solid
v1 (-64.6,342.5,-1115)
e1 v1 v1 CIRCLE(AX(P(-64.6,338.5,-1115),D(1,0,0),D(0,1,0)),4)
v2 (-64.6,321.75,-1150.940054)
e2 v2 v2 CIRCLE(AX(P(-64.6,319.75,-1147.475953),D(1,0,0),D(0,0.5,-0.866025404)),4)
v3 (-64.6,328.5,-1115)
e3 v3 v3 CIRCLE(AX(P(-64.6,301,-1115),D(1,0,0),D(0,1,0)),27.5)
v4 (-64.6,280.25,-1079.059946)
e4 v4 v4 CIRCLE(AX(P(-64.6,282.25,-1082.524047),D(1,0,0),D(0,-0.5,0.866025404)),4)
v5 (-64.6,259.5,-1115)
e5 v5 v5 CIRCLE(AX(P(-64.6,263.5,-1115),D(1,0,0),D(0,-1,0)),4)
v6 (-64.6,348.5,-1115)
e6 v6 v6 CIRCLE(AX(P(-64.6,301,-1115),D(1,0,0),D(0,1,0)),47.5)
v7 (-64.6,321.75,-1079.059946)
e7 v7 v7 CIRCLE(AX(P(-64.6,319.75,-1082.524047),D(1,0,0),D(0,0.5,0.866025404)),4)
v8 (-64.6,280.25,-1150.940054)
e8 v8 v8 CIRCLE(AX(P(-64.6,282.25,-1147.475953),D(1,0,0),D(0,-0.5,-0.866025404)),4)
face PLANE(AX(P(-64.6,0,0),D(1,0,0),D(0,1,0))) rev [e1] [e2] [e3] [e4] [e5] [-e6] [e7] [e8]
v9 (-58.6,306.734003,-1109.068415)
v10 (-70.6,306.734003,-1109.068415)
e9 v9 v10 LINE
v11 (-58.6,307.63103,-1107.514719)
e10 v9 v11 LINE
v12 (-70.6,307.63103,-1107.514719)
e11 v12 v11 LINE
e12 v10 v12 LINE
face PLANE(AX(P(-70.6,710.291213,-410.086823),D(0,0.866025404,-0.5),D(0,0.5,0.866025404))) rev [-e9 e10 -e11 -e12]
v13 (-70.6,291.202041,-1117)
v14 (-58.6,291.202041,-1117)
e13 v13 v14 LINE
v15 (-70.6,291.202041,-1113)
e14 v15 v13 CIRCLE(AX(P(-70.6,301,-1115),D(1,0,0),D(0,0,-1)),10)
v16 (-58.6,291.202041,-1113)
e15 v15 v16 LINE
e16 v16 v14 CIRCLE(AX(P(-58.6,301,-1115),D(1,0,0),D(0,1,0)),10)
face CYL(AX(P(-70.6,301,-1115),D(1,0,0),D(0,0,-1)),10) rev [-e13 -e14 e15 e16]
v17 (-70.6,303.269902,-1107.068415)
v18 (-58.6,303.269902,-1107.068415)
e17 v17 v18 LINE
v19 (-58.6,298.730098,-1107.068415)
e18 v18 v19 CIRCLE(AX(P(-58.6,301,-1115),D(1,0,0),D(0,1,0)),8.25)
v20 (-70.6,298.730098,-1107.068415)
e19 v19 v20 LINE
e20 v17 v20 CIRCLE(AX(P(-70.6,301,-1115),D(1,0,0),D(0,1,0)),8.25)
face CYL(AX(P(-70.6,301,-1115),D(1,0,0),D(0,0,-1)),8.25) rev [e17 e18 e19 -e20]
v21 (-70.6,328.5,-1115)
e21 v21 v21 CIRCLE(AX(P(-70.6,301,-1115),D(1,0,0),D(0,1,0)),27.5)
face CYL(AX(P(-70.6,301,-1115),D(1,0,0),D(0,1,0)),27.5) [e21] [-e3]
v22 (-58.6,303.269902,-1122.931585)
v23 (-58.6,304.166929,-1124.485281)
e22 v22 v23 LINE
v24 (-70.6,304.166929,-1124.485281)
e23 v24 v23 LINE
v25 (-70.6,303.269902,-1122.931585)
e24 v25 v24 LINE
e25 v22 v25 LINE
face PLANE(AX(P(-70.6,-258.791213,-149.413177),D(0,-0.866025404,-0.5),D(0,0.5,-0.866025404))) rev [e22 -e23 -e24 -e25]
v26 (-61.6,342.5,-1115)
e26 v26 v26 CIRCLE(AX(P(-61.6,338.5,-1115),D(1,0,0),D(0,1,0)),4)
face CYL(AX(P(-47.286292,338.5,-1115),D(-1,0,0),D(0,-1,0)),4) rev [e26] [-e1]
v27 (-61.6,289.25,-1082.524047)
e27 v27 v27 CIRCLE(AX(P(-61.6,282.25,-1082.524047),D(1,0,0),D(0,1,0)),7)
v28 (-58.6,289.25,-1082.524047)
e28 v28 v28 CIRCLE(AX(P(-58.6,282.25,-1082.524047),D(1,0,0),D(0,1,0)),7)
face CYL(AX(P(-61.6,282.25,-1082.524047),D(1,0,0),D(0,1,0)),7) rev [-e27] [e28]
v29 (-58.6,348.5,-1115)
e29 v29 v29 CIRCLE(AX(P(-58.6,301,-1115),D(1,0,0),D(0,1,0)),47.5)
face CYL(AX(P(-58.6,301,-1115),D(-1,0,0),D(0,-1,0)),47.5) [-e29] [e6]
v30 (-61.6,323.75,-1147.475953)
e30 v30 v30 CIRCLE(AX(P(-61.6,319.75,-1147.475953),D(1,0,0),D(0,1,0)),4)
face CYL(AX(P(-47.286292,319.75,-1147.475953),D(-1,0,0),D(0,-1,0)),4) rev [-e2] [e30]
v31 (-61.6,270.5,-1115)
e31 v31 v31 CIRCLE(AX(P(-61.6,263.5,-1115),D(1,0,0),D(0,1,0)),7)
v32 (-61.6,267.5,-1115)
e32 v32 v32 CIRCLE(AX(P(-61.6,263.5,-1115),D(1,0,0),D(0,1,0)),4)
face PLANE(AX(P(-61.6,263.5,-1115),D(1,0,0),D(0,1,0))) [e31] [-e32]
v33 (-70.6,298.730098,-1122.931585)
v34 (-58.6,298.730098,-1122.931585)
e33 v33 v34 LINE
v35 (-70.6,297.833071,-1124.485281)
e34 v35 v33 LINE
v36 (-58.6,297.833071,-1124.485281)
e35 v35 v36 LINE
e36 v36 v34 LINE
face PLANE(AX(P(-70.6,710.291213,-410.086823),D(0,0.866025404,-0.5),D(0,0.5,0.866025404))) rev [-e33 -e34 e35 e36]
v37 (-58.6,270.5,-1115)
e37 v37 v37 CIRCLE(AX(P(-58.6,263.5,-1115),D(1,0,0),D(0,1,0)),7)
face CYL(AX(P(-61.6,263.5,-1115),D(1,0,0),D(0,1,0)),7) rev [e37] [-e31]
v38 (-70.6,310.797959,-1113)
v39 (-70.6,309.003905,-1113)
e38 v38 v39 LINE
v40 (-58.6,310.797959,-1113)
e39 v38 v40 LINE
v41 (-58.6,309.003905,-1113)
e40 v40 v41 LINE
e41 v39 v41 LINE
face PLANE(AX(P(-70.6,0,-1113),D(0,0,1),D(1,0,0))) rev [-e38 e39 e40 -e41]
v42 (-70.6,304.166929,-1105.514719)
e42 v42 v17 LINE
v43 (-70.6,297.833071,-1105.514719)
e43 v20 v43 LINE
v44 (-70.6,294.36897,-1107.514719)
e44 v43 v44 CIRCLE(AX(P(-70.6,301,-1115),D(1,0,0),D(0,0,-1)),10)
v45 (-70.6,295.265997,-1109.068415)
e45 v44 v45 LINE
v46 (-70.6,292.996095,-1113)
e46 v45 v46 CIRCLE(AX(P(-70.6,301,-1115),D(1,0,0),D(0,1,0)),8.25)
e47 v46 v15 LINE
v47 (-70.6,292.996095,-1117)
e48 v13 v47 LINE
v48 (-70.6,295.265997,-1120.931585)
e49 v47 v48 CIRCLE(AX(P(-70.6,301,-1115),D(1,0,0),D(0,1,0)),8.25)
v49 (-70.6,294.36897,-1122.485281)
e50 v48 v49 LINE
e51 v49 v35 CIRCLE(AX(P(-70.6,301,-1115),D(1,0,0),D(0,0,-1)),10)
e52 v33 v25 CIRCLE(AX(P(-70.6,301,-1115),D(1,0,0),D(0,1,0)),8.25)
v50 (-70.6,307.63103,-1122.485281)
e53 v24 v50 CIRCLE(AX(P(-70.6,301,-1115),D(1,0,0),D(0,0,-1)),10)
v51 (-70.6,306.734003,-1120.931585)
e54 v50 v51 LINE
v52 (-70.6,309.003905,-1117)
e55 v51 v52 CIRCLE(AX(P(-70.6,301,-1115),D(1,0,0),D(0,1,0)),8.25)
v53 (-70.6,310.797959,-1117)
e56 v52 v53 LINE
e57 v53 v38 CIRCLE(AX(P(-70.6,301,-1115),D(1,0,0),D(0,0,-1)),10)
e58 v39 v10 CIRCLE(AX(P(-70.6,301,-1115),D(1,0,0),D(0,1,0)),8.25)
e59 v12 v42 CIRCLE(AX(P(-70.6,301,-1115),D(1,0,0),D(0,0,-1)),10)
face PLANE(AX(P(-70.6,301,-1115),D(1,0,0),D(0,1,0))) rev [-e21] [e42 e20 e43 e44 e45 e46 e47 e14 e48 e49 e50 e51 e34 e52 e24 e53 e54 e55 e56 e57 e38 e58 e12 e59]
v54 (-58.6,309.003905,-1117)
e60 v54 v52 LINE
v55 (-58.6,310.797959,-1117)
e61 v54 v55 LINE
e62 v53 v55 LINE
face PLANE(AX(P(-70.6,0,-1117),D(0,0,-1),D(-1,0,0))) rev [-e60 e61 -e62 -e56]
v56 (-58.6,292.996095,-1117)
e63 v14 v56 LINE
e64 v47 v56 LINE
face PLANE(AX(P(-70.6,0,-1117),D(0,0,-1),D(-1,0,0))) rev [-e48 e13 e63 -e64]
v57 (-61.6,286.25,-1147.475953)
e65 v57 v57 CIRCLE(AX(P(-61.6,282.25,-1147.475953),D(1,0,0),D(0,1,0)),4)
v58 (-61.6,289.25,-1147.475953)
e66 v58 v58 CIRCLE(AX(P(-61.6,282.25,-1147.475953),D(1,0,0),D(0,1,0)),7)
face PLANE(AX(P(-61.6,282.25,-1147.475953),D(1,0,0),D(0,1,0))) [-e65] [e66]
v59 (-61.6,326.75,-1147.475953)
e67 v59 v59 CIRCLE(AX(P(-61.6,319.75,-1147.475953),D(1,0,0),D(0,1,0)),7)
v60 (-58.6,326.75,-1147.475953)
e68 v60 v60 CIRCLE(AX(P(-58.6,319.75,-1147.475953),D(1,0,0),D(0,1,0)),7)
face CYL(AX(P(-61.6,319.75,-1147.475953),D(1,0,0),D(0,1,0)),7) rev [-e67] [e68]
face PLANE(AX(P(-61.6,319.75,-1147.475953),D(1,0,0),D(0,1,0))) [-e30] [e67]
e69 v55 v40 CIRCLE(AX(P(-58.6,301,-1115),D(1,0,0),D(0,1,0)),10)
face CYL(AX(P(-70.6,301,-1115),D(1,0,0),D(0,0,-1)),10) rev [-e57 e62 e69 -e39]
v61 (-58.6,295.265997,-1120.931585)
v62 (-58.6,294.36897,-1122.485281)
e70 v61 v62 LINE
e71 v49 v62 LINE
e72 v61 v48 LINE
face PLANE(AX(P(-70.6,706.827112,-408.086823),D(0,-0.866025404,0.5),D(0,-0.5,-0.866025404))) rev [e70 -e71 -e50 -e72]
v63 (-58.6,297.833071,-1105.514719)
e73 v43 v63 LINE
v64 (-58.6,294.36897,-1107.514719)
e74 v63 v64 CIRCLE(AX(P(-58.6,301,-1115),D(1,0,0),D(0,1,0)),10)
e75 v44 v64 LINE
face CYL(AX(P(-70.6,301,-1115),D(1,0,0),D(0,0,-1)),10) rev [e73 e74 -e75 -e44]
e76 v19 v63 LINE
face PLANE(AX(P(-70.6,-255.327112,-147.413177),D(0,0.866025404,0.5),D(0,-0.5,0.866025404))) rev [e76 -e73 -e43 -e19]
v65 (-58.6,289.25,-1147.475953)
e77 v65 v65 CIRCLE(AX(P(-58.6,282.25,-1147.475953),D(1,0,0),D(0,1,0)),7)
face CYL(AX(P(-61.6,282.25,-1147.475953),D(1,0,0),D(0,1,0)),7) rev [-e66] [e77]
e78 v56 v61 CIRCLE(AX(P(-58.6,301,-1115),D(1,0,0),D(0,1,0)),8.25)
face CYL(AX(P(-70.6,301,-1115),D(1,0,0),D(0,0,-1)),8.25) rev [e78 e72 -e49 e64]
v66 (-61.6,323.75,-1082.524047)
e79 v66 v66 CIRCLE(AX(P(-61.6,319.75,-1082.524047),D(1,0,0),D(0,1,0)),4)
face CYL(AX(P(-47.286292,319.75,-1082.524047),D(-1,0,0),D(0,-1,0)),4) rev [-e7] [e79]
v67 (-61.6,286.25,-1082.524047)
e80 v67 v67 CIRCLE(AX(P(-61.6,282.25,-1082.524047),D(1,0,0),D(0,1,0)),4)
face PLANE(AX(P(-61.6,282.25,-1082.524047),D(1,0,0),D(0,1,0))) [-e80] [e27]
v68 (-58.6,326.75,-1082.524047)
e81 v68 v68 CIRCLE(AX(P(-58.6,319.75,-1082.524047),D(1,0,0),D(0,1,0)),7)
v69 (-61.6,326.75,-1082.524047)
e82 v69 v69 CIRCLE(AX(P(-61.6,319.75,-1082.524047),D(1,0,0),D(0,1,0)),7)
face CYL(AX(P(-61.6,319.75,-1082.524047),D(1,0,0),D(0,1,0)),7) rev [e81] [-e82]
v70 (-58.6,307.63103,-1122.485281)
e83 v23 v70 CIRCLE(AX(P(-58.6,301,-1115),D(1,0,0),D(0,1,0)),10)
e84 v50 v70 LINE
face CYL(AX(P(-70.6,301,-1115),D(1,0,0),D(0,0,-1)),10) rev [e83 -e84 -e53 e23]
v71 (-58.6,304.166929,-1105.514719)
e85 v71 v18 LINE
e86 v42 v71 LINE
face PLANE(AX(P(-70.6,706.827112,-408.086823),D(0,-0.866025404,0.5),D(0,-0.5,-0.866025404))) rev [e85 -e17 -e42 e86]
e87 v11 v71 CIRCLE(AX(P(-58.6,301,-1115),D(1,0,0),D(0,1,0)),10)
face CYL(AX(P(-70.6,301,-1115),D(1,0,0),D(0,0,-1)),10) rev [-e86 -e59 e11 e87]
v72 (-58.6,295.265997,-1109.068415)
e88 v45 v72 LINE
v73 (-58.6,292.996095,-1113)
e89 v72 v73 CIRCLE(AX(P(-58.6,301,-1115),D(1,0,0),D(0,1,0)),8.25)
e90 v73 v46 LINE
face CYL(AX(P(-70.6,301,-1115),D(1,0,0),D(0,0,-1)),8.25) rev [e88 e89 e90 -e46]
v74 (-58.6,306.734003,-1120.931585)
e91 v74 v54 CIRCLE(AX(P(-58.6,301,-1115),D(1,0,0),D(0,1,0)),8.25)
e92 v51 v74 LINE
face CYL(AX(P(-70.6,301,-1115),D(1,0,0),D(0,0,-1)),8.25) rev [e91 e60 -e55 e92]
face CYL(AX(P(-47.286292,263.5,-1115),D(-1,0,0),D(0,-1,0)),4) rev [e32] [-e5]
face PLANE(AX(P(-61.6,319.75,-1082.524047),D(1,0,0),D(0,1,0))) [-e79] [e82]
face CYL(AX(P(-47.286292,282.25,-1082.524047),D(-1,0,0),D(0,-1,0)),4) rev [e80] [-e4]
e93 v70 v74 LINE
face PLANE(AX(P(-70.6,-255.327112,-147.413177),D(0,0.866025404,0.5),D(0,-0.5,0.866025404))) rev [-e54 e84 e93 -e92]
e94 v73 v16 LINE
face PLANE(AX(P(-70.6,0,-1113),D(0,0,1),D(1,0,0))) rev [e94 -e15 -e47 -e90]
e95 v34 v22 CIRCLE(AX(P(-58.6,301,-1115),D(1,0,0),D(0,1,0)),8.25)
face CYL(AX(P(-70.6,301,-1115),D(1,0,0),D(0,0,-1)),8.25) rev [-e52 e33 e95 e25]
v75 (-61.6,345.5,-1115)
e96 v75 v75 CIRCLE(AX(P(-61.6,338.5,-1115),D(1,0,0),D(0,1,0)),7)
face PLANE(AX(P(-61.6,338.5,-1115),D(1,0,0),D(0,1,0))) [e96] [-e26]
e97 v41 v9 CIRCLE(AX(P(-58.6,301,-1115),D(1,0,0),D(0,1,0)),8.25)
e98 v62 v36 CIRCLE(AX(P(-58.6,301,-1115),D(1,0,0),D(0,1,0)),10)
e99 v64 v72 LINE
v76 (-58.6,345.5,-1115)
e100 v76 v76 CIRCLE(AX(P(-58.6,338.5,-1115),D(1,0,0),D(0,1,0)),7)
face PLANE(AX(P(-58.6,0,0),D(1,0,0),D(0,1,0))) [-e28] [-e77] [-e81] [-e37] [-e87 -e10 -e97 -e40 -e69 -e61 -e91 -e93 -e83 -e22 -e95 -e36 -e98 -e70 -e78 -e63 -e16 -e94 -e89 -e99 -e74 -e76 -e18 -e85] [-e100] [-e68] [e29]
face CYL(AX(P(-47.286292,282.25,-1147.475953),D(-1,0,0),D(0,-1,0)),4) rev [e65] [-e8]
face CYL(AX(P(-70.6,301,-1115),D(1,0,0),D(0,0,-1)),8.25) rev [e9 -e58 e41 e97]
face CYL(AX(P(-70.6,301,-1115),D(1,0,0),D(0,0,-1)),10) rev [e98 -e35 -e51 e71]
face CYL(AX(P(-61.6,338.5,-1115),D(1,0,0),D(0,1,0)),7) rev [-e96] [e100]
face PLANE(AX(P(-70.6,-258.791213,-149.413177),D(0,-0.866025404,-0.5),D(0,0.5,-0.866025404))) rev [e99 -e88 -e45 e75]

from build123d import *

# Parameters (mm, degrees)
BOSS_EXTRUDE1_OUTLINE_R = 47.5
BOSS_EXTRUDE1_DEPTH     = 6
SKETCH3_R               = 27.5
BOSS_EXTRUDE2_DEPTH     = 6
SKETCH1_3_R             = 4
CUT_EXTRUDE1_DEPTH      = 6
CUT_EXTRUDE2_START      = 3
SKETCH1_4_R             = 7
SKETCH1_4_R_2           = 4
CUT_EXTRUDE2_DEPTH      = 3
CIRPATTERN1_COUNT       = 6
CUT_EXTRUDE3_START      = -58.6
SKETCH4_R               = 8.25
CUT_EXTRUDE3_DEPTH      = 1158.065603692
CUT_EXTRUDE5_DEPTH      = 1216.665603692


# Read off the part's stored shape, not the designer's step: Boss-Extrude1
with BuildPart() as part:
    # Boss-Extrude1 outline → Boss-Extrude1 (new body)
    with BuildSketch(Plane(origin=(-64.6, 0, 0), x_dir=(0, 0, -1), z_dir=(1, 0, 0))):
        with Locations((1115, 301)):
            Circle(BOSS_EXTRUDE1_OUTLINE_R)
    extrude(amount=BOSS_EXTRUDE1_DEPTH)

    # Sketch3 → Boss-Extrude2 (add)
    with BuildSketch(Plane(origin=(-64.6, 0, 0), x_dir=(0, 0, -1), z_dir=(1, 0, 0))):
        with Locations(Location((1115, 301, 0), (0, 0, 90))):
            Circle(SKETCH3_R)
    extrude(amount=-BOSS_EXTRUDE2_DEPTH)

    # Sketch1<3> → Cut-Extrude1 (cut)
    with BuildSketch(Plane(origin=(-64.6, 0, 0), x_dir=(0, 0, -1), z_dir=(1, 0, 0))):
        with Locations(Location((1115, 338.5, 0), (0, 0, 90))):
            Circle(SKETCH1_3_R)
    cut_extrude1 = extrude(amount=CUT_EXTRUDE1_DEPTH, mode=Mode.SUBTRACT)

    # Sketch1<4> → Cut-Extrude2 (cut)
    with BuildSketch(Plane(origin=(-64.6, 0, 0), x_dir=(0, 0, -1), z_dir=(1, 0, 0)).offset(CUT_EXTRUDE2_START)):
        with Locations(Location((1115, 338.5, 0), (0, 0, 90))):
            Circle(SKETCH1_4_R)
        with Locations(Location((1115, 338.5, 0), (0, 0, 90))):
            Circle(SKETCH1_4_R_2, mode=Mode.SUBTRACT)
    cut_extrude2 = extrude(amount=CUT_EXTRUDE2_DEPTH, mode=Mode.SUBTRACT)

    # CirPattern1: Cut-Extrude1, Cut-Extrude2 ×6 about axis
    cirpattern1_axis = Axis((0, 301, -1115), (1, 0, 0))
    add([cut_extrude1.rotate(cirpattern1_axis, i * 360 / CIRPATTERN1_COUNT) for i in range(1, CIRPATTERN1_COUNT)], mode=Mode.SUBTRACT)
    add([cut_extrude2.rotate(cirpattern1_axis, i * 360 / CIRPATTERN1_COUNT) for i in range(1, CIRPATTERN1_COUNT)], mode=Mode.SUBTRACT)

    # Sketch4 → Cut-Extrude3 (cut, through all)
    with BuildSketch(Plane(origin=(0, 0, 0), x_dir=(0, 0, -1), z_dir=(1, 0, 0)).offset(CUT_EXTRUDE3_START)):
        with Locations(Location((1115, 301, 0), (0, 0, 90))):
            Circle(SKETCH4_R)
    extrude(amount=-CUT_EXTRUDE3_DEPTH, mode=Mode.SUBTRACT)

    # Sketch5 → Cut-Extrude5 (cut, through all)
    with BuildSketch(Plane(origin=(0, 0, 0), x_dir=(0, 0, -1), z_dir=(1, 0, 0))):
        with BuildLine():
            Line((1117, 308.745966692), (1117, 310.797958971))
            ThreePointArc((1117, 310.797958971), (1115, 311), (1113, 310.797958971))
            Line((1113, 310.797958971), (1113, 308.745966692))
            ThreePointArc((1113, 308.745966692), (1115, 309), (1117, 308.745966692))
        make_face()
        with BuildLine():
            Line((1122.485281374, 307.631030293), (1120.708203932, 306.605034154))
            ThreePointArc((1120.708203932, 306.605034154), (1121.92820323, 305), (1122.708203932, 303.140932539))
            Line((1122.708203932, 303.140932539), (1124.485281374, 304.166928678))
            ThreePointArc((1124.485281374, 304.166928678), (1123.660254038, 306), (1122.485281374, 307.631030293))
        make_face()
        with BuildLine():
            ThreePointArc((1107.291796067, 303.140932539), (1108.07179677, 305), (1109.291796067, 306.605034154))
            Line((1109.291796067, 306.605034154), (1107.514718626, 307.631030293))
            ThreePointArc((1107.514718626, 307.631030293), (1106.339745962, 306), (1105.514718626, 304.166928678))
            Line((1105.514718626, 304.166928678), (1107.291796067, 303.140932539))
        make_face()
        with BuildLine():
            Line((1124.485281374, 297.833071322), (1122.708203932, 298.859067461))
            ThreePointArc((1122.708203932, 298.859067461), (1121.92820323, 297), (1120.708203932, 295.394965846))
            Line((1120.708203932, 295.394965846), (1122.485281374, 294.368969707))
            ThreePointArc((1122.485281374, 294.368969707), (1123.660254038, 296), (1124.485281374, 297.833071322))
        make_face()
        with BuildLine():
            ThreePointArc((1109.291796067, 295.394965846), (1108.07179677, 297), (1107.291796067, 298.859067461))
            Line((1107.291796067, 298.859067461), (1105.514718626, 297.833071322))
            ThreePointArc((1105.514718626, 297.833071322), (1106.339745962, 296), (1107.514718626, 294.368969707))
            Line((1107.514718626, 294.368969707), (1109.291796067, 295.394965846))
        make_face()
        with BuildLine():
            Line((1117, 291.202041029), (1117, 293.254033308))
            ThreePointArc((1117, 293.254033308), (1115, 293), (1113, 293.254033308))
            Line((1113, 293.254033308), (1113, 291.202041029))
            ThreePointArc((1113, 291.202041029), (1115, 291), (1117, 291.202041029))
        make_face()
    extrude(amount=-CUT_EXTRUDE5_DEPTH, mode=Mode.SUBTRACT)


solid = part.part
